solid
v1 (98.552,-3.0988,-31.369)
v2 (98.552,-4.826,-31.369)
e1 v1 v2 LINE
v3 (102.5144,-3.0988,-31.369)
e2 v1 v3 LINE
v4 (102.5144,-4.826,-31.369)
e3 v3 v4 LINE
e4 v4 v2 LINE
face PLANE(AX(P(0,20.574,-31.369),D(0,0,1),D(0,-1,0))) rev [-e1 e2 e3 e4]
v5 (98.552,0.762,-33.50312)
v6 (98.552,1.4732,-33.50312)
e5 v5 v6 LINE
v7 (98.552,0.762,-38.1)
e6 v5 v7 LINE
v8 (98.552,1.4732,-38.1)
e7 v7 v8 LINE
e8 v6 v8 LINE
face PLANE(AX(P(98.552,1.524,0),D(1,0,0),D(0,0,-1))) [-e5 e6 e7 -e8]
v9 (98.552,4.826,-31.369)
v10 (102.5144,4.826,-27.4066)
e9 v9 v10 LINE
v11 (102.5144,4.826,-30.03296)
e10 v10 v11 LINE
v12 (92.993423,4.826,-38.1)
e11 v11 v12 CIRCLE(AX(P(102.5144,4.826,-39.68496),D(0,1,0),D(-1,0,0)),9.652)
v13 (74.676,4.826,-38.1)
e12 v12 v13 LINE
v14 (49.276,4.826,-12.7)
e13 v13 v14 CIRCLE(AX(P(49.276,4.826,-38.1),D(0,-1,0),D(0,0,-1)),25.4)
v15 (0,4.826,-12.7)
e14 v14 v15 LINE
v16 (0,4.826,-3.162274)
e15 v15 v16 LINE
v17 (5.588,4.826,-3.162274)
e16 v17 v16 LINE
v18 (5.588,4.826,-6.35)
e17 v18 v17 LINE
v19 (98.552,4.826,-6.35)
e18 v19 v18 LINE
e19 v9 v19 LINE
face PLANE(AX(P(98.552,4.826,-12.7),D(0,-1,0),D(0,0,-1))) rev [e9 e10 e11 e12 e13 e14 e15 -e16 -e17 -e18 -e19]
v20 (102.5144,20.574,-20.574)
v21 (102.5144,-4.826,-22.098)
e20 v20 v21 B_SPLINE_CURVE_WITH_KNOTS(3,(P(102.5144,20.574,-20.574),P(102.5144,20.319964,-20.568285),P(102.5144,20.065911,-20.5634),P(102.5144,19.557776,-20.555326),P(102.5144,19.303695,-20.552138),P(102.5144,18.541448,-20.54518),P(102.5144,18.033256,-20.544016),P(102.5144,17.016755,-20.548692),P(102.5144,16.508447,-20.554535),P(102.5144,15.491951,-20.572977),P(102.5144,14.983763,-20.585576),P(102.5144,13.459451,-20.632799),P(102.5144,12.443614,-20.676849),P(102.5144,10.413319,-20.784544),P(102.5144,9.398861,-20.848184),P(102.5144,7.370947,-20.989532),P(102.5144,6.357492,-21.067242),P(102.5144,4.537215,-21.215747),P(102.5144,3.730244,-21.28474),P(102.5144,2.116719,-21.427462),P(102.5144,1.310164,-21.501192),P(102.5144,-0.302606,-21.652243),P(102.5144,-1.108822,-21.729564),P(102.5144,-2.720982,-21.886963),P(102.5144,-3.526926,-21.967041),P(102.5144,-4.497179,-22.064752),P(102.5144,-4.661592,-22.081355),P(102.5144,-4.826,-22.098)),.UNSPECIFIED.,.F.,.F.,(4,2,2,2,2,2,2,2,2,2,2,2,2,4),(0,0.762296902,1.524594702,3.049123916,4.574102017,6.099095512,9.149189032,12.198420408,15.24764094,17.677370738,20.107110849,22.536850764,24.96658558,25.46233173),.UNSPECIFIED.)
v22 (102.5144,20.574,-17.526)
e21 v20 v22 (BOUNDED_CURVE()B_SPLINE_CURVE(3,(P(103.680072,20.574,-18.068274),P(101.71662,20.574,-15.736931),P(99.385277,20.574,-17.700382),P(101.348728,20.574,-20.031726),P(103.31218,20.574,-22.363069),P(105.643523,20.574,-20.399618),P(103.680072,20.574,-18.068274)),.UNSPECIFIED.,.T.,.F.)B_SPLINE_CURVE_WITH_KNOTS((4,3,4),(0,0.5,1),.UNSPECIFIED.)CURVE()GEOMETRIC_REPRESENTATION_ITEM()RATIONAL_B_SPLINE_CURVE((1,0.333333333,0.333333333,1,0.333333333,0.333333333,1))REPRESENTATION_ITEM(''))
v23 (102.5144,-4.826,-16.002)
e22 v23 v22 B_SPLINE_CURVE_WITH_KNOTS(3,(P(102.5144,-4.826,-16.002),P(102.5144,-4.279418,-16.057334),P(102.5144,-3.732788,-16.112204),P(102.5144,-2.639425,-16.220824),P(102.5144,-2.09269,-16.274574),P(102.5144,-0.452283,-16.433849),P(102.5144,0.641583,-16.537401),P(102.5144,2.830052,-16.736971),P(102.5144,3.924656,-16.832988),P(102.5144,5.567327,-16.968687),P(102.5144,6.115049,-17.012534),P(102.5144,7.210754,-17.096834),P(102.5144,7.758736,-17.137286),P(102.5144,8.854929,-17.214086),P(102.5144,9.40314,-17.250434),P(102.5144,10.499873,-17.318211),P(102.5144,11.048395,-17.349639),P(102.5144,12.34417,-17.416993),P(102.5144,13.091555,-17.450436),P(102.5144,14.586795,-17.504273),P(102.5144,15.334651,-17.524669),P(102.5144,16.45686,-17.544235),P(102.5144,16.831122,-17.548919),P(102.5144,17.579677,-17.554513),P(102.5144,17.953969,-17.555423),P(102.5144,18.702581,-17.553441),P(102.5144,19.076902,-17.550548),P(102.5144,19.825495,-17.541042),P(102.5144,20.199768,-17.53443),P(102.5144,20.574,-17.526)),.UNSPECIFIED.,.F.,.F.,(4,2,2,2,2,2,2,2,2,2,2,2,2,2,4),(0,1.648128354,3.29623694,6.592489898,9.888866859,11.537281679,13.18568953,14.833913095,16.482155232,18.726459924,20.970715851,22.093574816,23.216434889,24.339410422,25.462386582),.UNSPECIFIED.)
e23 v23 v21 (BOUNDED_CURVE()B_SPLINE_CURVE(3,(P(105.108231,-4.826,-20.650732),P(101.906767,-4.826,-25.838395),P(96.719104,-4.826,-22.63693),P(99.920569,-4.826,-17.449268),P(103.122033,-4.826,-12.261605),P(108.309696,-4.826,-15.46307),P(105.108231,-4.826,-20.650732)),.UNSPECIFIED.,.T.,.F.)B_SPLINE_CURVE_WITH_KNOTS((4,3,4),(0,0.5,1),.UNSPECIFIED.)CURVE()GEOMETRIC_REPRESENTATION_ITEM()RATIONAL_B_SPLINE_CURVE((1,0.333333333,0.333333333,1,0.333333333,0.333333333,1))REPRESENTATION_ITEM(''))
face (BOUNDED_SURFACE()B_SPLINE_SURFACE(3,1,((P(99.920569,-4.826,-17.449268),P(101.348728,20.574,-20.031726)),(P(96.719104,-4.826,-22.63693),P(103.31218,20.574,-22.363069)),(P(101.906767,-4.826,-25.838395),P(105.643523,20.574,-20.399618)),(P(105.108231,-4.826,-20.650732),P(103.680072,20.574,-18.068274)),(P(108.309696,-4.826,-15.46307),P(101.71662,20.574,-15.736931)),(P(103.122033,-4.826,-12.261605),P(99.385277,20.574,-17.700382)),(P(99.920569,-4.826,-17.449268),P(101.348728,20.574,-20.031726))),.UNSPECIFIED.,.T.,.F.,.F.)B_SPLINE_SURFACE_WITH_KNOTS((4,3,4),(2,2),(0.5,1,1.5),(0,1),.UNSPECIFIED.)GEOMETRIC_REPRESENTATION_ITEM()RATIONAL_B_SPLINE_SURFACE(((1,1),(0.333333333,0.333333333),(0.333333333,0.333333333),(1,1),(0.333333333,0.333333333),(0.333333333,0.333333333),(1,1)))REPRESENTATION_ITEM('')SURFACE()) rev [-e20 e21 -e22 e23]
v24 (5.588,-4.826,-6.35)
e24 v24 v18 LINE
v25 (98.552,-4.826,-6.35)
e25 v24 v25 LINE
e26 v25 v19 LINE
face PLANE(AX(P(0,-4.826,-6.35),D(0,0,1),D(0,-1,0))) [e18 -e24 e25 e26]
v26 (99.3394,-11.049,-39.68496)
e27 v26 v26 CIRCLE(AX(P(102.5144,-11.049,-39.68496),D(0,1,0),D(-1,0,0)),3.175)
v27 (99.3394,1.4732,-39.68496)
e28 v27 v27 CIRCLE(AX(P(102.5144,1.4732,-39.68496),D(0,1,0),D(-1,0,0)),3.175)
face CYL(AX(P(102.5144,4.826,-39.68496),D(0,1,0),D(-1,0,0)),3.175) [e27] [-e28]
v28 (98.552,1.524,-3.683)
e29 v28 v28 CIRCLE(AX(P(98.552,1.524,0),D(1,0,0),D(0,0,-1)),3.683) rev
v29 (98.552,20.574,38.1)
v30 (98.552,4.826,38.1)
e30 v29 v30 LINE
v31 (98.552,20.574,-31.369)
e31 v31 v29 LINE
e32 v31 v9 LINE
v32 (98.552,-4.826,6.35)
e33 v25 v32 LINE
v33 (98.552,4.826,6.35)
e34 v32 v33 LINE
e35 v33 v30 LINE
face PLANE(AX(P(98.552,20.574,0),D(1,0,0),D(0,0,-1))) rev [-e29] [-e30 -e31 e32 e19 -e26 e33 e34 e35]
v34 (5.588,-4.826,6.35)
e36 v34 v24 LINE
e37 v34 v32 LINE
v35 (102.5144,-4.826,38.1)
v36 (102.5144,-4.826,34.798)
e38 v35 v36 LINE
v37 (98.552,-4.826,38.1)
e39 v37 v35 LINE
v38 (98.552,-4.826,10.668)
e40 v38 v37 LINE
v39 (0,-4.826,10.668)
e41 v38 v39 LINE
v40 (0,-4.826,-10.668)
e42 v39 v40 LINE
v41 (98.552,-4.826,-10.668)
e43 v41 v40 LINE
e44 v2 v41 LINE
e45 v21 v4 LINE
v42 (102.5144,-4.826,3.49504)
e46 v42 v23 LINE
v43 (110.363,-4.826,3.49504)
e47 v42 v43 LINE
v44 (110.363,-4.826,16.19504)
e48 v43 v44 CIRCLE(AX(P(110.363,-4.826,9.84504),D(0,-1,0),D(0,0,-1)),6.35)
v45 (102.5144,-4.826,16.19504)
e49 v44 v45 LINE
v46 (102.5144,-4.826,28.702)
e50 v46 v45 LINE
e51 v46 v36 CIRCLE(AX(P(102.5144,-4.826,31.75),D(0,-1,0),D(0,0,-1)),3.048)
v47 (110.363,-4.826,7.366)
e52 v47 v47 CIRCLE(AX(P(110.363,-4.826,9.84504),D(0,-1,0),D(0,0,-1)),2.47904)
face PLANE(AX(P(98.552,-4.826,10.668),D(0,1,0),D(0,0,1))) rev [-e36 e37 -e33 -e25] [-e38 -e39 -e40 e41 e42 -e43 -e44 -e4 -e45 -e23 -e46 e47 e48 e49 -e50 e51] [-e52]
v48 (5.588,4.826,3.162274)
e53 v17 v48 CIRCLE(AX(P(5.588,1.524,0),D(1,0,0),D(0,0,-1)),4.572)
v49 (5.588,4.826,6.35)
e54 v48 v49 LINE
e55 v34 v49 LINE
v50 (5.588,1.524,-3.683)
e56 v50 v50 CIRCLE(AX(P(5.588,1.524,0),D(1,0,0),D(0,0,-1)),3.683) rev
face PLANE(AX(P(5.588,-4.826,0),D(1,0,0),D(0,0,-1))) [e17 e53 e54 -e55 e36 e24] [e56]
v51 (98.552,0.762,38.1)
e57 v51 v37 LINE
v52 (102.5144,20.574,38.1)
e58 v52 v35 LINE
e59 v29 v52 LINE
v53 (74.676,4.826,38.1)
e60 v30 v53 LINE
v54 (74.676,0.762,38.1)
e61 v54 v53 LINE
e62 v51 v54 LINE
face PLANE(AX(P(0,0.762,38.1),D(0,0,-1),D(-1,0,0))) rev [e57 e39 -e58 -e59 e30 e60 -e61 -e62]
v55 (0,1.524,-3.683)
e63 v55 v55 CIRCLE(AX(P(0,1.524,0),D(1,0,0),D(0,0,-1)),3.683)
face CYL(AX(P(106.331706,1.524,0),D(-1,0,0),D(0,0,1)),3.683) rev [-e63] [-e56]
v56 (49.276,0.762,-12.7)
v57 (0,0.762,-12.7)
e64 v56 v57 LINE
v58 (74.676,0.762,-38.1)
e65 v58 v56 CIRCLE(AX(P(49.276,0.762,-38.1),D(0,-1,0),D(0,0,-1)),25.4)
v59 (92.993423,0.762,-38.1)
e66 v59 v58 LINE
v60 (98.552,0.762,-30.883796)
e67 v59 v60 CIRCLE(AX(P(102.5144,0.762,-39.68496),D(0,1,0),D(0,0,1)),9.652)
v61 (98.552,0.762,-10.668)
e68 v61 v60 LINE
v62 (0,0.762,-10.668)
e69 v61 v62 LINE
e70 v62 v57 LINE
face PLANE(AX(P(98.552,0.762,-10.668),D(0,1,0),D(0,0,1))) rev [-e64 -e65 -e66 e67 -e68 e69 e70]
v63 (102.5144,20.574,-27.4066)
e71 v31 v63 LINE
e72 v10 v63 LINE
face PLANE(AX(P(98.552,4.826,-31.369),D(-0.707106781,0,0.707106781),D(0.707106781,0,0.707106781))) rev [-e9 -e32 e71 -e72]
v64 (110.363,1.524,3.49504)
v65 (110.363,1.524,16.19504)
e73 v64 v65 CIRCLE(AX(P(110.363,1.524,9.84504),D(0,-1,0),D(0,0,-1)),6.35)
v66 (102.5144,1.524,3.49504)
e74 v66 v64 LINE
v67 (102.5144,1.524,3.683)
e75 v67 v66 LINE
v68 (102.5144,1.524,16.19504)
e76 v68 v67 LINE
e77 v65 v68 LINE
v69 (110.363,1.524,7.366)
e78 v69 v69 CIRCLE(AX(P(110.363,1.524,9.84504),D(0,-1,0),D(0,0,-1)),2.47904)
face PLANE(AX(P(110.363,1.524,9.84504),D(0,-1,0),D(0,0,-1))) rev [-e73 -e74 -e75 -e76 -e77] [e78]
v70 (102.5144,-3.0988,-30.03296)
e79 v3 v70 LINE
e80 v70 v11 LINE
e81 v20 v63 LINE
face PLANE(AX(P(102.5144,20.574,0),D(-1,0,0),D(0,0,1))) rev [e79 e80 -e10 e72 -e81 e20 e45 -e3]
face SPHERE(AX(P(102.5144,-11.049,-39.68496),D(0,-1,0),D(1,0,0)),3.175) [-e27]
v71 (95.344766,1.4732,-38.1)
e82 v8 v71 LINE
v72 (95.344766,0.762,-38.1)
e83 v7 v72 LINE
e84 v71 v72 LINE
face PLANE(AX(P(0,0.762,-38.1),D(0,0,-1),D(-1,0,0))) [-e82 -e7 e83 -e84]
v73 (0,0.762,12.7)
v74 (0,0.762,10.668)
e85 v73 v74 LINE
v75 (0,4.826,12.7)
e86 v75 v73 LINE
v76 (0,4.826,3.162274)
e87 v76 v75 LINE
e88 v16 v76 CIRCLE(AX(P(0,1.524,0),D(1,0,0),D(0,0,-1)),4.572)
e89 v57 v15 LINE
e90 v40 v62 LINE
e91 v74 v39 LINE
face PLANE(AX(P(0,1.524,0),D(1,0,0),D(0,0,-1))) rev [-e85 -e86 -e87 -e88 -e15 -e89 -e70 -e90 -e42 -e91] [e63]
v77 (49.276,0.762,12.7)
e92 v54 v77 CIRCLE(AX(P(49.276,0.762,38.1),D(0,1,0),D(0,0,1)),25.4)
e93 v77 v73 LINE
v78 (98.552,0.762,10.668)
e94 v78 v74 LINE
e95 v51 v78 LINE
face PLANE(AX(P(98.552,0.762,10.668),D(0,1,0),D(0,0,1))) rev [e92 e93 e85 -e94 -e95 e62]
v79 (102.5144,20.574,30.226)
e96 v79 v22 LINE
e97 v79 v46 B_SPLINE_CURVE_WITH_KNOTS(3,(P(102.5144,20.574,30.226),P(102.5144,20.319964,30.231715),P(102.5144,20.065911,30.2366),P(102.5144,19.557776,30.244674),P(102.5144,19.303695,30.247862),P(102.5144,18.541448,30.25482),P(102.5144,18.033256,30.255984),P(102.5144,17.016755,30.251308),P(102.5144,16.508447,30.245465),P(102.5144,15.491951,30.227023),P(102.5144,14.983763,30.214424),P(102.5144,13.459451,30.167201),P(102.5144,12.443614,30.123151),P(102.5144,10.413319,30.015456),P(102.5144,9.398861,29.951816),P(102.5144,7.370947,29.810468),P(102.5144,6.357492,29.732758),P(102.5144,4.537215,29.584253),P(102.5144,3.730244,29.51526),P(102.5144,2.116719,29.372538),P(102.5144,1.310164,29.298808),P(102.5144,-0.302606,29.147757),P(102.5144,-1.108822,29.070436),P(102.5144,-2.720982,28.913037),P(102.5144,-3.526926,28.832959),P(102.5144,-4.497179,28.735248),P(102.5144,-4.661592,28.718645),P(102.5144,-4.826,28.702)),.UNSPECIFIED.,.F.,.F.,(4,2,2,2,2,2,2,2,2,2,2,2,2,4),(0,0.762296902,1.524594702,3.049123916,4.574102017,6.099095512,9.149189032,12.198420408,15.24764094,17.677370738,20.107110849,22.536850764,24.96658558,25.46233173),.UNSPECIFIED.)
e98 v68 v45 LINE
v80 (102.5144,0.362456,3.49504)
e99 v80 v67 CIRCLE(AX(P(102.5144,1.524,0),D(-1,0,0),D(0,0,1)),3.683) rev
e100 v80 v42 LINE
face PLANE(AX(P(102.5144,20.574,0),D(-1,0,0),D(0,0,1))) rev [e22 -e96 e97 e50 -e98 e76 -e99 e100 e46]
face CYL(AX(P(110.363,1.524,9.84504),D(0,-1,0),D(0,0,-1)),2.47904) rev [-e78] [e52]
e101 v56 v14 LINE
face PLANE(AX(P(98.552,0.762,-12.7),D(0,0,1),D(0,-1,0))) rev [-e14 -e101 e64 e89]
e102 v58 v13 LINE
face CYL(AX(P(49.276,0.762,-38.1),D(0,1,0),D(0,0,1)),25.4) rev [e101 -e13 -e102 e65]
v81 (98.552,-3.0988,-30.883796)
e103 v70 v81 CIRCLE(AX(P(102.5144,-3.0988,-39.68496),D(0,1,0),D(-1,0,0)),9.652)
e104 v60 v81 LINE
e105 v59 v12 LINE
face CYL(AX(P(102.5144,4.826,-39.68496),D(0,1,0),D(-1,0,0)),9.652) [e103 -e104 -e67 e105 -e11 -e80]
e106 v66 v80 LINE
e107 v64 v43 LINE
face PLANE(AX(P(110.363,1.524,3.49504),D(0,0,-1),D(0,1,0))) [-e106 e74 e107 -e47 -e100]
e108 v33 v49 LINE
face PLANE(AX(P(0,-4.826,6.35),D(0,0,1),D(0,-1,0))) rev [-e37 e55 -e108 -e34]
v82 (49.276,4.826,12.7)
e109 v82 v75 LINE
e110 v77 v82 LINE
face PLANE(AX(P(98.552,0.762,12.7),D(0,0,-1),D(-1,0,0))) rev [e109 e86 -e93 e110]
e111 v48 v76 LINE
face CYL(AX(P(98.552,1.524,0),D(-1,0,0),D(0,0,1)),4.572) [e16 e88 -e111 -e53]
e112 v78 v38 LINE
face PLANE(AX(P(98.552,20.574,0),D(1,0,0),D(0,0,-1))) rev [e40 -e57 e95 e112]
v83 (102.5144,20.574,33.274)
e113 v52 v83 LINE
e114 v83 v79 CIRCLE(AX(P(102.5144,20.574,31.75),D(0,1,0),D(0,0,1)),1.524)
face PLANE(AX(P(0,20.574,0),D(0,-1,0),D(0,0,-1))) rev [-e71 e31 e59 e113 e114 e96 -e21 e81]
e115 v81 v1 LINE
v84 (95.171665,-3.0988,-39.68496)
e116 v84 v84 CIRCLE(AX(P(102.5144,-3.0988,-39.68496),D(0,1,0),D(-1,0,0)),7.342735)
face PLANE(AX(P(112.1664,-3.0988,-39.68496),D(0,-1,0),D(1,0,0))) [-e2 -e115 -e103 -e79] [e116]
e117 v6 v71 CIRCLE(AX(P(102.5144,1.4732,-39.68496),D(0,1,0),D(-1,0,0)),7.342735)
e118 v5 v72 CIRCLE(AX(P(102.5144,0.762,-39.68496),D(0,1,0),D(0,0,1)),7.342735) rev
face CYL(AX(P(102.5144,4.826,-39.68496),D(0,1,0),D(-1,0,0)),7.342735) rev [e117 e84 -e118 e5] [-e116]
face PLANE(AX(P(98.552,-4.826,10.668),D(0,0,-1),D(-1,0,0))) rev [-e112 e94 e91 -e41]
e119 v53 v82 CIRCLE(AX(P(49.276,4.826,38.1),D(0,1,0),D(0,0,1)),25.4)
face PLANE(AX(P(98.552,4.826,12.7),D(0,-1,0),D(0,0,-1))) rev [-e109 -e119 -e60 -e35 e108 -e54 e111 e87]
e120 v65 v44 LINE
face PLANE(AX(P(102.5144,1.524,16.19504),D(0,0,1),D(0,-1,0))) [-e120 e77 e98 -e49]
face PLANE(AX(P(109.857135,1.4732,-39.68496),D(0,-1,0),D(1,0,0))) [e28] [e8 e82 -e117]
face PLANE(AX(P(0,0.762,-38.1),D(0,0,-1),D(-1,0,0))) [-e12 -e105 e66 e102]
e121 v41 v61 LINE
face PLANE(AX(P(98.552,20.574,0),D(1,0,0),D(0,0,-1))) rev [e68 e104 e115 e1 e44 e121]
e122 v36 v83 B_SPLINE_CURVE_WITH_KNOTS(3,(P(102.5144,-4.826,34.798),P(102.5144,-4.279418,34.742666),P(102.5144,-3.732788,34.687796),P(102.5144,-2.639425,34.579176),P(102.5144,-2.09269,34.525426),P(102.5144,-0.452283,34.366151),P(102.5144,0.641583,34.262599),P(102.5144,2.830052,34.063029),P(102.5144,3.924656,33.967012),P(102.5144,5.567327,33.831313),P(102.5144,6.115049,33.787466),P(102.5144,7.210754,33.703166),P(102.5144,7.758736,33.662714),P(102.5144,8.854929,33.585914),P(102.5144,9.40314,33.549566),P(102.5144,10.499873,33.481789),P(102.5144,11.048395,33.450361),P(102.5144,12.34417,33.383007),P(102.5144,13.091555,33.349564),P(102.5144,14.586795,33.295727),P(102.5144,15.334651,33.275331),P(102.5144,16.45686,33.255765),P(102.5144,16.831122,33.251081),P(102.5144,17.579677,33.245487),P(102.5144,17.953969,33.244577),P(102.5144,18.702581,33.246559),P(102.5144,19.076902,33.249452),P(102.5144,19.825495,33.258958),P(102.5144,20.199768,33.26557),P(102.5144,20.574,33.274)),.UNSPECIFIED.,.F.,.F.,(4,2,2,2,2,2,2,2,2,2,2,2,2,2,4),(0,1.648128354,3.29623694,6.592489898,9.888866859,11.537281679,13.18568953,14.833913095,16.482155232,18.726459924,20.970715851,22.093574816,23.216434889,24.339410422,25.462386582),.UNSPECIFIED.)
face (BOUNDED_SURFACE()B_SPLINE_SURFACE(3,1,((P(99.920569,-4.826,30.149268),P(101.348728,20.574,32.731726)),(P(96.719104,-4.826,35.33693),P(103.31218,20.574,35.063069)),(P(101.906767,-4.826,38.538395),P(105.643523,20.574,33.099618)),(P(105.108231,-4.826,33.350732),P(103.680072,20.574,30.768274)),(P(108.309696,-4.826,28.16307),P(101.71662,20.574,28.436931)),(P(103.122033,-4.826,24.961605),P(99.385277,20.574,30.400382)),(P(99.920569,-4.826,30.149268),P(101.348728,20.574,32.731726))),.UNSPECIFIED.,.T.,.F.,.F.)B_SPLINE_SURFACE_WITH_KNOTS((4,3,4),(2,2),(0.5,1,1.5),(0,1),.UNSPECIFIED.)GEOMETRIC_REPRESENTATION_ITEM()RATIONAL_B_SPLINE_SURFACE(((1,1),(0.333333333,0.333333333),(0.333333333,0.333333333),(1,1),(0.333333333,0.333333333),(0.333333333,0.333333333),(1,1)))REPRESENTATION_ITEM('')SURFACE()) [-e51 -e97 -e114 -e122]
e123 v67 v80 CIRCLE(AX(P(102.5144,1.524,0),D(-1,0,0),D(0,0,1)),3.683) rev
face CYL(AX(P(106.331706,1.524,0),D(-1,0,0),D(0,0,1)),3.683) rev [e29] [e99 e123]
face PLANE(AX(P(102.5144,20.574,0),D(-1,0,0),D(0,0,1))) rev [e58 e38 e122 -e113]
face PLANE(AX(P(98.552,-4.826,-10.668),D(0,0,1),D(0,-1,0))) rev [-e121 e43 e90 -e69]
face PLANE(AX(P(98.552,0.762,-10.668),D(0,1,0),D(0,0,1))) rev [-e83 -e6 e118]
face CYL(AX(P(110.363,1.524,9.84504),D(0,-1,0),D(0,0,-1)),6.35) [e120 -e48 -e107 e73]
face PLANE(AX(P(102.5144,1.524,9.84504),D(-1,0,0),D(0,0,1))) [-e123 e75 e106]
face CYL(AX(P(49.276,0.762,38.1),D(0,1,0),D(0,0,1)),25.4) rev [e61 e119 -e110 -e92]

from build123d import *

# Parameters (mm, degrees)
BOSS_EXTRUDE1_DEPTH     = 98.552
CUT_EXTRUDE2_DEPTH      = 100.834602258
CUT_EXTRUDE2_DEPTH_BACK = 100.834602258
SKETCH2_W               = 92.964
SKETCH2_H               = 3.187725502
BOSS_EXTRUDE2_START     = -4.064
BOSS_EXTRUDE2_DEPTH     = 4.064
BOSS_EXTRUDE3_DEPTH     = 25.4
CUT_EXTRUDE3_DEPTH      = 109.948520702
CUT_EXTRUDE3_DEPTH_BACK = 109.948520702
SKETCH9_R               = 3.683
SKETCH11_R              = 2.47904
BOSS_EXTRUDE4_DEPTH     = 6.35
FILLET1_R               = 3.175
CUT_EXTRUDE4_DEPTH      = 15.748


with BuildPart() as part:
    # Sketch1 → Boss-Extrude1 (new body)
    with BuildSketch(Plane(origin=(0, 0, 0), x_dir=(0, 0, -1), z_dir=(1, 0, 0))):
        with BuildLine():
            Line((-10.668, -4.826), (10.668, -4.826))
            Line((10.668, -4.826), (10.668, 0.762))
            Line((10.668, 0.762), (12.7, 0.762))
            Line((12.7, 0.762), (12.7, 4.826))
            Line((12.7, 4.826), (3.162274498, 4.826))
            ThreePointArc((3.162274498, 4.826), (0, 6.096), (-3.162274498, 4.826))
            Line((-3.162274498, 4.826), (-12.7, 4.826))
            Line((-12.7, 4.826), (-12.7, 0.762))
            Line((-12.7, 0.762), (-10.668, 0.762))
            Line((-10.668, 0.762), (-10.668, -4.826))
        make_face()
    extrude(amount=BOSS_EXTRUDE1_DEPTH)

    # Sketch2 → Cut-Extrude2 (cut, two sides: drawn at the far end of the back side and taken through both)
    with BuildSketch(Plane(origin=(0, 4.826, 0), x_dir=(1, 0, 0), z_dir=(0, 1, 0)).offset(-CUT_EXTRUDE2_DEPTH_BACK)):
        with Locations((52.07, -4.756137249)):
            Rectangle(SKETCH2_W, SKETCH2_H)
        Polygon((5.588, 6.35), (5.588, 0), (5.588, -3.162274498), (98.552, -3.162274498), (98.552, 6.35), align=None)
    extrude(amount=CUT_EXTRUDE2_DEPTH + CUT_EXTRUDE2_DEPTH_BACK, mode=Mode.SUBTRACT)

    # Sketch3 → Boss-Extrude2 (add)
    with BuildSketch(Plane(origin=(0, 4.826, 0), x_dir=(1, 0, 0), z_dir=(0, 1, 0)).offset(BOSS_EXTRUDE2_START)):
        with BuildLine():
            Line((98.552, -12.7), (49.276, -12.7))
            ThreePointArc((49.276, -12.7), (67.236512242, -20.139487758), (74.676, -38.1))
            Line((74.676, -38.1), (98.552, -38.1))
            Line((98.552, -38.1), (98.552, -12.7))
        make_face()
    boss_extrude2 = extrude(amount=BOSS_EXTRUDE2_DEPTH)

    # Mirror1: Boss-Extrude2 across plane
    add(boss_extrude2.mirror(Plane.XY))

    # Sketch5 → Boss-Extrude3 (add)
    with BuildSketch(Plane.XZ.offset(4.826)):
        Polygon((98.552, 6.35), (98.552, 0), (98.552, -6.35), (98.552, -10.668), (98.552, -31.369), (102.5144, -31.369), (102.5144, 31.75), (102.5144, 38.1), (98.552, 38.1), (98.552, 10.668), align=None)
    extrude(amount=-BOSS_EXTRUDE3_DEPTH)

    # Loft1: read off the stored shape, not the designer's step
    # Loft1: loft between two sections, ruled curve by curve
    loft1_from = [
        Edge.make_bspline([(99.920568819, -4.826, 30.149267728), (96.719104275, -4.826, 35.336930089), (101.906766636, -4.826, 38.538394633), (105.108231181, -4.826, 33.350732272), (108.309695725, -4.826, 28.163069911), (103.122033364, -4.826, 24.961605367), (99.920568819, -4.826, 30.149267728)], [0.5, 0.5, 0.5, 0.5, 1, 1, 1, 1.5, 1.5, 1.5, 1.5], 3, [1, 0.333333333, 0.333333333, 1, 0.333333333, 0.333333333, 1]),
    ]
    loft1_to = [
        Edge.make_bspline([(101.34872832, 20.574, 32.731725793), (103.312179906, 20.574, 35.063069154), (105.643523267, 20.574, 33.099617568), (103.68007168, 20.574, 30.768274207), (101.716620094, 20.574, 28.436930846), (99.385276733, 20.574, 30.400382432), (101.34872832, 20.574, 32.731725793)], [0.5, 0.5, 0.5, 0.5, 1, 1, 1, 1.5, 1.5, 1.5, 1.5], 3, [1, 0.333333333, 0.333333333, 1, 0.333333333, 0.333333333, 1]),
    ]
    loft1 = Solid(Shell([*[Face.make_surface_from_curves(loft1_from[k], loft1_to[k]) for k in range(1)], Face(Wire(loft1_from)), Face(Wire(loft1_to))]))
    add(loft1)

    # Mirror2: Loft1 across plane
    add(loft1.mirror(Plane(origin=(0, 0, 6.35), x_dir=(1, 0, 0), z_dir=(0, 0, -1))))

    # Sketch9 → Cut-Extrude3 (cut, two sides: drawn at the far end of the back side and taken through both)
    with BuildSketch(Plane(origin=(5.588, 0, 0), x_dir=(0, 0, -1), z_dir=(1, 0, 0)).offset(-CUT_EXTRUDE3_DEPTH_BACK)):
        with Locations(Location((0, 1.524, 0), (0, 0, 180))):
            Circle(SKETCH9_R)
    extrude(amount=CUT_EXTRUDE3_DEPTH + CUT_EXTRUDE3_DEPTH_BACK, mode=Mode.SUBTRACT)

    # Sketch11 → Boss-Extrude4 (add)
    with BuildSketch(Plane.XZ.offset(4.826)):
        with BuildLine():
            Line((102.5144, 16.19504), (110.363, 16.19504))
            ThreePointArc((110.363, 16.19504), (116.713, 9.84504), (110.363, 3.49504))
            Line((110.363, 3.49504), (102.5144, 3.49504))
            Line((102.5144, 3.49504), (102.5144, 9.84504))
            Line((102.5144, 9.84504), (102.5144, 16.19504))
        make_face()
        with Locations(Location((110.363, 9.84504, 0), (0, 0, 270))):
            Circle(SKETCH11_R, mode=Mode.SUBTRACT)
    extrude(amount=-BOSS_EXTRUDE4_DEPTH)

    # Sketch14 → Revolve1 (revolve)
    with BuildSketch(Plane(origin=(0, 0, -39.68496), x_dir=(-1, 0, 0), z_dir=(0, 0, -1)), mode=Mode.PRIVATE) as revolve1_sk:
        Polygon((-102.5144, 4.826), (-102.5144, -14.224), (-105.6894, -14.224), (-105.6894, 1.4732), (-109.857134902, 1.4732), (-109.857134902, -3.0988), (-112.1664, -3.0988), (-112.1664, 4.826), align=None)
    revolve(revolve1_sk.sketch.rotate(Axis((102.5144, 4.826, -39.68496), (0, -1, 0)), 180), axis=Axis((102.5144, 4.826, -39.68496), (0, -1, 0)))

    # Fillet1
    fillet1_edges = [part.edges().sort_by_distance(p)[0] for p in [
        (105.6894, -14.224, -39.68496),
    ]]
    fillet(fillet1_edges, radius=FILLET1_R)

    # Sketch15 → Cut-Extrude4 (cut)
    with BuildSketch(Plane(origin=(0, 20.574, 0), x_dir=(1, 0, 0), z_dir=(0, 1, 0))):
        Polygon((98.552, 31.369), (102.5144, 27.4066), (102.5144, 31.369), align=None)
    extrude(amount=-CUT_EXTRUDE4_DEPTH, mode=Mode.SUBTRACT)


solid = part.part
